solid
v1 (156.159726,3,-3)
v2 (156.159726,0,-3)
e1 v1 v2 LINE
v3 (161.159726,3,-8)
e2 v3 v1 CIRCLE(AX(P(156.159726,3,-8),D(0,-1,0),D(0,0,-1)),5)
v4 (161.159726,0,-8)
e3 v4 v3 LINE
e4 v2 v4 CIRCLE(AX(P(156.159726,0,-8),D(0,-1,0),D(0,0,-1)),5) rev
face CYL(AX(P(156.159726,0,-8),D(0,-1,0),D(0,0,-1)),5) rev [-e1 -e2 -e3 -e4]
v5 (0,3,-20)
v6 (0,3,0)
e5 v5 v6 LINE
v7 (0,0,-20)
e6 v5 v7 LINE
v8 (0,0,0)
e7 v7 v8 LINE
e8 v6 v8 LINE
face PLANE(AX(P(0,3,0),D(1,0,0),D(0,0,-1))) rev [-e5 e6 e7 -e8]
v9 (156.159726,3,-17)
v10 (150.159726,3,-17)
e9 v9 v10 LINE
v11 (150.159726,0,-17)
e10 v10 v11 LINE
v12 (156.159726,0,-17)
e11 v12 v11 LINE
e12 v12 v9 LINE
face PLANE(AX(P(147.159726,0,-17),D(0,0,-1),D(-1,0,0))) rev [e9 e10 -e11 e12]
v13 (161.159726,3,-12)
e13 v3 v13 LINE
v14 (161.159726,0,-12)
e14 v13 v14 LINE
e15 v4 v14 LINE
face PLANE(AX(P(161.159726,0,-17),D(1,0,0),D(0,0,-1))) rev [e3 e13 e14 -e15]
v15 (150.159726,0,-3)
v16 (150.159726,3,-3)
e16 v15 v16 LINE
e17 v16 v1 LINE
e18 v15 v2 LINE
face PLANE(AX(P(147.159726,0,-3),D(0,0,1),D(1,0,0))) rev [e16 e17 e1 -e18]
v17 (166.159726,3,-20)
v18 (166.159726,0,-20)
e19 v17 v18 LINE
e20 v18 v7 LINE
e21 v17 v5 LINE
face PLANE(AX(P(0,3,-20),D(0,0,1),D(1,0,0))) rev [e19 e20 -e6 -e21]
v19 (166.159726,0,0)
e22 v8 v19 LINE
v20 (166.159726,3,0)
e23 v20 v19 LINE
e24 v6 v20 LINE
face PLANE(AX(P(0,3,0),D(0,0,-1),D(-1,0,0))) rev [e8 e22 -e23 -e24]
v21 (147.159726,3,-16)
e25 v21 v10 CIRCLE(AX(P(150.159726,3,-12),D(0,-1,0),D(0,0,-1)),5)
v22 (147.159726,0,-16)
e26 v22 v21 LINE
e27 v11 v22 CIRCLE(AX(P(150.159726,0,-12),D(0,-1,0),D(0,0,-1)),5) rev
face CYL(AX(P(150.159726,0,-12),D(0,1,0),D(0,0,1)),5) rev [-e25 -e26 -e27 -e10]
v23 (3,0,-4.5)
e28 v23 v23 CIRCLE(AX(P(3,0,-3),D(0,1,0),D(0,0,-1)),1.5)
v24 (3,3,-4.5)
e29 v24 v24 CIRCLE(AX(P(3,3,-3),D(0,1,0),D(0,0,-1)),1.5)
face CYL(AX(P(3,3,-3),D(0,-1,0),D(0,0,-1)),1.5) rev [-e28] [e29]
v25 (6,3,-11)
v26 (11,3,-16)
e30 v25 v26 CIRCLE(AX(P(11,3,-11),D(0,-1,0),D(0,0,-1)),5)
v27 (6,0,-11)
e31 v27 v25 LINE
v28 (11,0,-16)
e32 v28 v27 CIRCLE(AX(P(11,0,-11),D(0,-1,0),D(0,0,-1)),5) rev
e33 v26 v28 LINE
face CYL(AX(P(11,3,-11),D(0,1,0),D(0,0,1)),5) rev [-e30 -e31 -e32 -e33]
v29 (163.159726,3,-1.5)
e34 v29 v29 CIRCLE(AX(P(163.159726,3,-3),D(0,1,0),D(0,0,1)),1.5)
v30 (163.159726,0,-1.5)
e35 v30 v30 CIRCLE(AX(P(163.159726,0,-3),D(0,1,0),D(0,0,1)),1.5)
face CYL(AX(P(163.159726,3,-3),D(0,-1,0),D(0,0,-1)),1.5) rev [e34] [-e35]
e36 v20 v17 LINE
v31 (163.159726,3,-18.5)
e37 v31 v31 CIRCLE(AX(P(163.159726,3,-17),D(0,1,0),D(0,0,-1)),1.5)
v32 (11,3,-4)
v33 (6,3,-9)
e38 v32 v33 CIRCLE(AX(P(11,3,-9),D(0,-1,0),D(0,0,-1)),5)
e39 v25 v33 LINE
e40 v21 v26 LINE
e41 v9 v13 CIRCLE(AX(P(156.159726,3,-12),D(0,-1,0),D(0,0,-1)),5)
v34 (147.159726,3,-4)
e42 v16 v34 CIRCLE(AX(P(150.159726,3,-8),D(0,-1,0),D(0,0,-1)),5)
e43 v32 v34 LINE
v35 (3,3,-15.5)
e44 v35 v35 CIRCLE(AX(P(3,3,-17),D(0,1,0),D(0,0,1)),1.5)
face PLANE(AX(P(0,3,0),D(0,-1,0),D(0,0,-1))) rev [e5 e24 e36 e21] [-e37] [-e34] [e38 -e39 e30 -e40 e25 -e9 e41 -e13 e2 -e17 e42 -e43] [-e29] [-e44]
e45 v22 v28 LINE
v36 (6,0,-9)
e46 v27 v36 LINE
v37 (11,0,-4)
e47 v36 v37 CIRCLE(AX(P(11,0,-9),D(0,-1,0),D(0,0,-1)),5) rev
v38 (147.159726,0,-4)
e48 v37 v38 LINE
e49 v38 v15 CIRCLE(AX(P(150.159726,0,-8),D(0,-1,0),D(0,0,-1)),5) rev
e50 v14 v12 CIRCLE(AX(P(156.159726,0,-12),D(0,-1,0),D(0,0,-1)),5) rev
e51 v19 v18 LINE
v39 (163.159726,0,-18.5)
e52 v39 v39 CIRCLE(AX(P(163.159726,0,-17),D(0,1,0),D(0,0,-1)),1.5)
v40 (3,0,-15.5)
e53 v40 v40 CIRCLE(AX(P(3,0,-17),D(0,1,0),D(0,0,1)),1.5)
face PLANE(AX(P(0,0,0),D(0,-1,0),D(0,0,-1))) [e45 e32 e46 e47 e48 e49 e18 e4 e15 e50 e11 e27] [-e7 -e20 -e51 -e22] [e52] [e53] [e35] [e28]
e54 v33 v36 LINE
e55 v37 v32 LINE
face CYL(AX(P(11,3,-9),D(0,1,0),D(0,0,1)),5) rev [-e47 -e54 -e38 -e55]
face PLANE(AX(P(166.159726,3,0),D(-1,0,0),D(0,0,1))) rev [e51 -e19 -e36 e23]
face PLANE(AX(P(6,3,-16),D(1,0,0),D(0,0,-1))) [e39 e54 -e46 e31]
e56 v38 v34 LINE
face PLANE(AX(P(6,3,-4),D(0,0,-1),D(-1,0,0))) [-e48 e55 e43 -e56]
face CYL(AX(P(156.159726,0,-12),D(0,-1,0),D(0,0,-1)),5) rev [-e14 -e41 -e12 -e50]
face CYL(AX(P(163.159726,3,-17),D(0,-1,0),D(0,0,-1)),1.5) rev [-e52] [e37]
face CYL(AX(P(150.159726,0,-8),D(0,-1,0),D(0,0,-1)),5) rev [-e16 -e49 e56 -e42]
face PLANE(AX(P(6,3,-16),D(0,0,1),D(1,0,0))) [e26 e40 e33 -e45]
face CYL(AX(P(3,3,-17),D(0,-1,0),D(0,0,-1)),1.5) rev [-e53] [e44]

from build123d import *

# Parameters (mm, degrees)
SKETCH1_W           = 166.159725664
SKETCH1_H           = 20
SKETCH1_R           = 1.5
SKETCH1_W_2         = 154.159725664
SKETCH1_H_2         = 12
BOSS_EXTRUDE1_DEPTH = 3
CUT_EXTRUDE1_DEPTH  = 168.38594455
FILLET1_R           = 5


with BuildPart() as part:
    # Sketch1 → Boss-Extrude1 (new body)
    with BuildSketch(Plane(origin=(0, 0, 0), x_dir=(1, 0, 0), z_dir=(0, 1, 0))):
        with Locations((83.079862832, 10)):
            Rectangle(SKETCH1_W, SKETCH1_H)
        with Locations(Location((3, 17, 0), (0, 0, 270))):
            Circle(SKETCH1_R, mode=Mode.SUBTRACT)
        with Locations(Location((3, 3, 0), (0, 0, 90))):
            Circle(SKETCH1_R, mode=Mode.SUBTRACT)
        with Locations(Location((163.159725664, 3, 0), (0, 0, 270))):
            Circle(SKETCH1_R, mode=Mode.SUBTRACT)
        with Locations(Location((163.159725664, 17, 0), (0, 0, 90))):
            Circle(SKETCH1_R, mode=Mode.SUBTRACT)
        with Locations((83.079862832, 10)):
            Rectangle(SKETCH1_W_2, SKETCH1_H_2, mode=Mode.SUBTRACT)
    extrude(amount=BOSS_EXTRUDE1_DEPTH)

    # Sketch2 → Cut-Extrude1 (cut, through all)
    with BuildSketch(Plane(origin=(0, 3, 0), x_dir=(1, 0, 0), z_dir=(0, 1, 0))):
        Polygon((147.159725664, 17), (147.159725664, 16), (160.159725664, 16), (160.159725664, 4), (147.159725664, 4), (147.159725664, 3), (161.159725664, 3), (161.159725664, 17), align=None)
    extrude(amount=-CUT_EXTRUDE1_DEPTH, mode=Mode.SUBTRACT)

    # Fillet1
    # the kernel refuses this fillet: 5 mm, written as the material it adds along each edge
    with BuildSketch(Plane(origin=(161.159725664, 3, -17), x_dir=(0, 0, 1), z_dir=(0, -1, 0)), Plane(origin=(161.159725664, 3, -3), x_dir=(-1, 0, 0), z_dir=(0, -1, 0)), Plane(origin=(6, 0, -16), x_dir=(0, 0, 1), z_dir=(0, 1, 0))) as fillet1_piece_1:
        with BuildLine():
            CenterArc((FILLET1_R, FILLET1_R), FILLET1_R, 180, 90)
            Line((0, FILLET1_R), (-FILLET1_R * 0.02, FILLET1_R))
            Line((-FILLET1_R * 0.02, FILLET1_R), (-FILLET1_R * 0.02, -FILLET1_R * 0.02))
            Line((-FILLET1_R * 0.02, -FILLET1_R * 0.02), (FILLET1_R, -FILLET1_R * 0.02))
            Line((FILLET1_R, -FILLET1_R * 0.02), (FILLET1_R, 0))
        make_face()
    extrude(amount=3)
    with BuildSketch(Plane(origin=(147.159725664, 3, -17), x_dir=(1, 0, 0), z_dir=(0, -1, 0))) as fillet1_piece_2:
        with BuildLine():
            CenterArc((3, 5), FILLET1_R, 233.130102354, 36.869897646)
            Line((0, 1), (-0.06, 0.92))
            ThreePointArc((-0.06, 0.92), (-0.1, 0.5), (-0.1, 0))
            Line((-0.1, 0), (0, -0.1))
            Line((0, -0.1), (3, -0.1))
            Line((3, -0.1), (3, 0))
        make_face()
    extrude(amount=3)
    with BuildSketch(Plane(origin=(147.159725664, 3, -3), x_dir=(0, 0, -1), z_dir=(0, -1, 0))) as fillet1_piece_3:
        with BuildLine():
            CenterArc((5, 3), FILLET1_R, 180, 36.869897646)
            Line((0, 3), (-0.1, 3))
            Line((-0.1, 3), (-0.1, 0))
            Line((-0.1, 0), (0, -0.1))
            ThreePointArc((0, -0.1), (0.5, -0.1), (0.92, -0.06))
            Line((0.92, -0.06), (1, 0))
        make_face()
    extrude(amount=3)
    with BuildSketch(Plane(origin=(6, 0, -4), x_dir=(0, 0, -1), z_dir=(0, 1, 0))) as fillet1_piece_4:
        with BuildLine():
            CenterArc((FILLET1_R, -FILLET1_R), FILLET1_R, 90, 90)
            Line((0, -FILLET1_R), (-FILLET1_R * 0.02, -FILLET1_R))
            Line((-FILLET1_R * 0.02, -FILLET1_R), (-FILLET1_R * 0.02, FILLET1_R * 0.02))
            Line((-FILLET1_R * 0.02, FILLET1_R * 0.02), (FILLET1_R, FILLET1_R * 0.02))
            Line((FILLET1_R, FILLET1_R * 0.02), (FILLET1_R, 0))
        make_face()
    extrude(amount=3)


solid = part.part
